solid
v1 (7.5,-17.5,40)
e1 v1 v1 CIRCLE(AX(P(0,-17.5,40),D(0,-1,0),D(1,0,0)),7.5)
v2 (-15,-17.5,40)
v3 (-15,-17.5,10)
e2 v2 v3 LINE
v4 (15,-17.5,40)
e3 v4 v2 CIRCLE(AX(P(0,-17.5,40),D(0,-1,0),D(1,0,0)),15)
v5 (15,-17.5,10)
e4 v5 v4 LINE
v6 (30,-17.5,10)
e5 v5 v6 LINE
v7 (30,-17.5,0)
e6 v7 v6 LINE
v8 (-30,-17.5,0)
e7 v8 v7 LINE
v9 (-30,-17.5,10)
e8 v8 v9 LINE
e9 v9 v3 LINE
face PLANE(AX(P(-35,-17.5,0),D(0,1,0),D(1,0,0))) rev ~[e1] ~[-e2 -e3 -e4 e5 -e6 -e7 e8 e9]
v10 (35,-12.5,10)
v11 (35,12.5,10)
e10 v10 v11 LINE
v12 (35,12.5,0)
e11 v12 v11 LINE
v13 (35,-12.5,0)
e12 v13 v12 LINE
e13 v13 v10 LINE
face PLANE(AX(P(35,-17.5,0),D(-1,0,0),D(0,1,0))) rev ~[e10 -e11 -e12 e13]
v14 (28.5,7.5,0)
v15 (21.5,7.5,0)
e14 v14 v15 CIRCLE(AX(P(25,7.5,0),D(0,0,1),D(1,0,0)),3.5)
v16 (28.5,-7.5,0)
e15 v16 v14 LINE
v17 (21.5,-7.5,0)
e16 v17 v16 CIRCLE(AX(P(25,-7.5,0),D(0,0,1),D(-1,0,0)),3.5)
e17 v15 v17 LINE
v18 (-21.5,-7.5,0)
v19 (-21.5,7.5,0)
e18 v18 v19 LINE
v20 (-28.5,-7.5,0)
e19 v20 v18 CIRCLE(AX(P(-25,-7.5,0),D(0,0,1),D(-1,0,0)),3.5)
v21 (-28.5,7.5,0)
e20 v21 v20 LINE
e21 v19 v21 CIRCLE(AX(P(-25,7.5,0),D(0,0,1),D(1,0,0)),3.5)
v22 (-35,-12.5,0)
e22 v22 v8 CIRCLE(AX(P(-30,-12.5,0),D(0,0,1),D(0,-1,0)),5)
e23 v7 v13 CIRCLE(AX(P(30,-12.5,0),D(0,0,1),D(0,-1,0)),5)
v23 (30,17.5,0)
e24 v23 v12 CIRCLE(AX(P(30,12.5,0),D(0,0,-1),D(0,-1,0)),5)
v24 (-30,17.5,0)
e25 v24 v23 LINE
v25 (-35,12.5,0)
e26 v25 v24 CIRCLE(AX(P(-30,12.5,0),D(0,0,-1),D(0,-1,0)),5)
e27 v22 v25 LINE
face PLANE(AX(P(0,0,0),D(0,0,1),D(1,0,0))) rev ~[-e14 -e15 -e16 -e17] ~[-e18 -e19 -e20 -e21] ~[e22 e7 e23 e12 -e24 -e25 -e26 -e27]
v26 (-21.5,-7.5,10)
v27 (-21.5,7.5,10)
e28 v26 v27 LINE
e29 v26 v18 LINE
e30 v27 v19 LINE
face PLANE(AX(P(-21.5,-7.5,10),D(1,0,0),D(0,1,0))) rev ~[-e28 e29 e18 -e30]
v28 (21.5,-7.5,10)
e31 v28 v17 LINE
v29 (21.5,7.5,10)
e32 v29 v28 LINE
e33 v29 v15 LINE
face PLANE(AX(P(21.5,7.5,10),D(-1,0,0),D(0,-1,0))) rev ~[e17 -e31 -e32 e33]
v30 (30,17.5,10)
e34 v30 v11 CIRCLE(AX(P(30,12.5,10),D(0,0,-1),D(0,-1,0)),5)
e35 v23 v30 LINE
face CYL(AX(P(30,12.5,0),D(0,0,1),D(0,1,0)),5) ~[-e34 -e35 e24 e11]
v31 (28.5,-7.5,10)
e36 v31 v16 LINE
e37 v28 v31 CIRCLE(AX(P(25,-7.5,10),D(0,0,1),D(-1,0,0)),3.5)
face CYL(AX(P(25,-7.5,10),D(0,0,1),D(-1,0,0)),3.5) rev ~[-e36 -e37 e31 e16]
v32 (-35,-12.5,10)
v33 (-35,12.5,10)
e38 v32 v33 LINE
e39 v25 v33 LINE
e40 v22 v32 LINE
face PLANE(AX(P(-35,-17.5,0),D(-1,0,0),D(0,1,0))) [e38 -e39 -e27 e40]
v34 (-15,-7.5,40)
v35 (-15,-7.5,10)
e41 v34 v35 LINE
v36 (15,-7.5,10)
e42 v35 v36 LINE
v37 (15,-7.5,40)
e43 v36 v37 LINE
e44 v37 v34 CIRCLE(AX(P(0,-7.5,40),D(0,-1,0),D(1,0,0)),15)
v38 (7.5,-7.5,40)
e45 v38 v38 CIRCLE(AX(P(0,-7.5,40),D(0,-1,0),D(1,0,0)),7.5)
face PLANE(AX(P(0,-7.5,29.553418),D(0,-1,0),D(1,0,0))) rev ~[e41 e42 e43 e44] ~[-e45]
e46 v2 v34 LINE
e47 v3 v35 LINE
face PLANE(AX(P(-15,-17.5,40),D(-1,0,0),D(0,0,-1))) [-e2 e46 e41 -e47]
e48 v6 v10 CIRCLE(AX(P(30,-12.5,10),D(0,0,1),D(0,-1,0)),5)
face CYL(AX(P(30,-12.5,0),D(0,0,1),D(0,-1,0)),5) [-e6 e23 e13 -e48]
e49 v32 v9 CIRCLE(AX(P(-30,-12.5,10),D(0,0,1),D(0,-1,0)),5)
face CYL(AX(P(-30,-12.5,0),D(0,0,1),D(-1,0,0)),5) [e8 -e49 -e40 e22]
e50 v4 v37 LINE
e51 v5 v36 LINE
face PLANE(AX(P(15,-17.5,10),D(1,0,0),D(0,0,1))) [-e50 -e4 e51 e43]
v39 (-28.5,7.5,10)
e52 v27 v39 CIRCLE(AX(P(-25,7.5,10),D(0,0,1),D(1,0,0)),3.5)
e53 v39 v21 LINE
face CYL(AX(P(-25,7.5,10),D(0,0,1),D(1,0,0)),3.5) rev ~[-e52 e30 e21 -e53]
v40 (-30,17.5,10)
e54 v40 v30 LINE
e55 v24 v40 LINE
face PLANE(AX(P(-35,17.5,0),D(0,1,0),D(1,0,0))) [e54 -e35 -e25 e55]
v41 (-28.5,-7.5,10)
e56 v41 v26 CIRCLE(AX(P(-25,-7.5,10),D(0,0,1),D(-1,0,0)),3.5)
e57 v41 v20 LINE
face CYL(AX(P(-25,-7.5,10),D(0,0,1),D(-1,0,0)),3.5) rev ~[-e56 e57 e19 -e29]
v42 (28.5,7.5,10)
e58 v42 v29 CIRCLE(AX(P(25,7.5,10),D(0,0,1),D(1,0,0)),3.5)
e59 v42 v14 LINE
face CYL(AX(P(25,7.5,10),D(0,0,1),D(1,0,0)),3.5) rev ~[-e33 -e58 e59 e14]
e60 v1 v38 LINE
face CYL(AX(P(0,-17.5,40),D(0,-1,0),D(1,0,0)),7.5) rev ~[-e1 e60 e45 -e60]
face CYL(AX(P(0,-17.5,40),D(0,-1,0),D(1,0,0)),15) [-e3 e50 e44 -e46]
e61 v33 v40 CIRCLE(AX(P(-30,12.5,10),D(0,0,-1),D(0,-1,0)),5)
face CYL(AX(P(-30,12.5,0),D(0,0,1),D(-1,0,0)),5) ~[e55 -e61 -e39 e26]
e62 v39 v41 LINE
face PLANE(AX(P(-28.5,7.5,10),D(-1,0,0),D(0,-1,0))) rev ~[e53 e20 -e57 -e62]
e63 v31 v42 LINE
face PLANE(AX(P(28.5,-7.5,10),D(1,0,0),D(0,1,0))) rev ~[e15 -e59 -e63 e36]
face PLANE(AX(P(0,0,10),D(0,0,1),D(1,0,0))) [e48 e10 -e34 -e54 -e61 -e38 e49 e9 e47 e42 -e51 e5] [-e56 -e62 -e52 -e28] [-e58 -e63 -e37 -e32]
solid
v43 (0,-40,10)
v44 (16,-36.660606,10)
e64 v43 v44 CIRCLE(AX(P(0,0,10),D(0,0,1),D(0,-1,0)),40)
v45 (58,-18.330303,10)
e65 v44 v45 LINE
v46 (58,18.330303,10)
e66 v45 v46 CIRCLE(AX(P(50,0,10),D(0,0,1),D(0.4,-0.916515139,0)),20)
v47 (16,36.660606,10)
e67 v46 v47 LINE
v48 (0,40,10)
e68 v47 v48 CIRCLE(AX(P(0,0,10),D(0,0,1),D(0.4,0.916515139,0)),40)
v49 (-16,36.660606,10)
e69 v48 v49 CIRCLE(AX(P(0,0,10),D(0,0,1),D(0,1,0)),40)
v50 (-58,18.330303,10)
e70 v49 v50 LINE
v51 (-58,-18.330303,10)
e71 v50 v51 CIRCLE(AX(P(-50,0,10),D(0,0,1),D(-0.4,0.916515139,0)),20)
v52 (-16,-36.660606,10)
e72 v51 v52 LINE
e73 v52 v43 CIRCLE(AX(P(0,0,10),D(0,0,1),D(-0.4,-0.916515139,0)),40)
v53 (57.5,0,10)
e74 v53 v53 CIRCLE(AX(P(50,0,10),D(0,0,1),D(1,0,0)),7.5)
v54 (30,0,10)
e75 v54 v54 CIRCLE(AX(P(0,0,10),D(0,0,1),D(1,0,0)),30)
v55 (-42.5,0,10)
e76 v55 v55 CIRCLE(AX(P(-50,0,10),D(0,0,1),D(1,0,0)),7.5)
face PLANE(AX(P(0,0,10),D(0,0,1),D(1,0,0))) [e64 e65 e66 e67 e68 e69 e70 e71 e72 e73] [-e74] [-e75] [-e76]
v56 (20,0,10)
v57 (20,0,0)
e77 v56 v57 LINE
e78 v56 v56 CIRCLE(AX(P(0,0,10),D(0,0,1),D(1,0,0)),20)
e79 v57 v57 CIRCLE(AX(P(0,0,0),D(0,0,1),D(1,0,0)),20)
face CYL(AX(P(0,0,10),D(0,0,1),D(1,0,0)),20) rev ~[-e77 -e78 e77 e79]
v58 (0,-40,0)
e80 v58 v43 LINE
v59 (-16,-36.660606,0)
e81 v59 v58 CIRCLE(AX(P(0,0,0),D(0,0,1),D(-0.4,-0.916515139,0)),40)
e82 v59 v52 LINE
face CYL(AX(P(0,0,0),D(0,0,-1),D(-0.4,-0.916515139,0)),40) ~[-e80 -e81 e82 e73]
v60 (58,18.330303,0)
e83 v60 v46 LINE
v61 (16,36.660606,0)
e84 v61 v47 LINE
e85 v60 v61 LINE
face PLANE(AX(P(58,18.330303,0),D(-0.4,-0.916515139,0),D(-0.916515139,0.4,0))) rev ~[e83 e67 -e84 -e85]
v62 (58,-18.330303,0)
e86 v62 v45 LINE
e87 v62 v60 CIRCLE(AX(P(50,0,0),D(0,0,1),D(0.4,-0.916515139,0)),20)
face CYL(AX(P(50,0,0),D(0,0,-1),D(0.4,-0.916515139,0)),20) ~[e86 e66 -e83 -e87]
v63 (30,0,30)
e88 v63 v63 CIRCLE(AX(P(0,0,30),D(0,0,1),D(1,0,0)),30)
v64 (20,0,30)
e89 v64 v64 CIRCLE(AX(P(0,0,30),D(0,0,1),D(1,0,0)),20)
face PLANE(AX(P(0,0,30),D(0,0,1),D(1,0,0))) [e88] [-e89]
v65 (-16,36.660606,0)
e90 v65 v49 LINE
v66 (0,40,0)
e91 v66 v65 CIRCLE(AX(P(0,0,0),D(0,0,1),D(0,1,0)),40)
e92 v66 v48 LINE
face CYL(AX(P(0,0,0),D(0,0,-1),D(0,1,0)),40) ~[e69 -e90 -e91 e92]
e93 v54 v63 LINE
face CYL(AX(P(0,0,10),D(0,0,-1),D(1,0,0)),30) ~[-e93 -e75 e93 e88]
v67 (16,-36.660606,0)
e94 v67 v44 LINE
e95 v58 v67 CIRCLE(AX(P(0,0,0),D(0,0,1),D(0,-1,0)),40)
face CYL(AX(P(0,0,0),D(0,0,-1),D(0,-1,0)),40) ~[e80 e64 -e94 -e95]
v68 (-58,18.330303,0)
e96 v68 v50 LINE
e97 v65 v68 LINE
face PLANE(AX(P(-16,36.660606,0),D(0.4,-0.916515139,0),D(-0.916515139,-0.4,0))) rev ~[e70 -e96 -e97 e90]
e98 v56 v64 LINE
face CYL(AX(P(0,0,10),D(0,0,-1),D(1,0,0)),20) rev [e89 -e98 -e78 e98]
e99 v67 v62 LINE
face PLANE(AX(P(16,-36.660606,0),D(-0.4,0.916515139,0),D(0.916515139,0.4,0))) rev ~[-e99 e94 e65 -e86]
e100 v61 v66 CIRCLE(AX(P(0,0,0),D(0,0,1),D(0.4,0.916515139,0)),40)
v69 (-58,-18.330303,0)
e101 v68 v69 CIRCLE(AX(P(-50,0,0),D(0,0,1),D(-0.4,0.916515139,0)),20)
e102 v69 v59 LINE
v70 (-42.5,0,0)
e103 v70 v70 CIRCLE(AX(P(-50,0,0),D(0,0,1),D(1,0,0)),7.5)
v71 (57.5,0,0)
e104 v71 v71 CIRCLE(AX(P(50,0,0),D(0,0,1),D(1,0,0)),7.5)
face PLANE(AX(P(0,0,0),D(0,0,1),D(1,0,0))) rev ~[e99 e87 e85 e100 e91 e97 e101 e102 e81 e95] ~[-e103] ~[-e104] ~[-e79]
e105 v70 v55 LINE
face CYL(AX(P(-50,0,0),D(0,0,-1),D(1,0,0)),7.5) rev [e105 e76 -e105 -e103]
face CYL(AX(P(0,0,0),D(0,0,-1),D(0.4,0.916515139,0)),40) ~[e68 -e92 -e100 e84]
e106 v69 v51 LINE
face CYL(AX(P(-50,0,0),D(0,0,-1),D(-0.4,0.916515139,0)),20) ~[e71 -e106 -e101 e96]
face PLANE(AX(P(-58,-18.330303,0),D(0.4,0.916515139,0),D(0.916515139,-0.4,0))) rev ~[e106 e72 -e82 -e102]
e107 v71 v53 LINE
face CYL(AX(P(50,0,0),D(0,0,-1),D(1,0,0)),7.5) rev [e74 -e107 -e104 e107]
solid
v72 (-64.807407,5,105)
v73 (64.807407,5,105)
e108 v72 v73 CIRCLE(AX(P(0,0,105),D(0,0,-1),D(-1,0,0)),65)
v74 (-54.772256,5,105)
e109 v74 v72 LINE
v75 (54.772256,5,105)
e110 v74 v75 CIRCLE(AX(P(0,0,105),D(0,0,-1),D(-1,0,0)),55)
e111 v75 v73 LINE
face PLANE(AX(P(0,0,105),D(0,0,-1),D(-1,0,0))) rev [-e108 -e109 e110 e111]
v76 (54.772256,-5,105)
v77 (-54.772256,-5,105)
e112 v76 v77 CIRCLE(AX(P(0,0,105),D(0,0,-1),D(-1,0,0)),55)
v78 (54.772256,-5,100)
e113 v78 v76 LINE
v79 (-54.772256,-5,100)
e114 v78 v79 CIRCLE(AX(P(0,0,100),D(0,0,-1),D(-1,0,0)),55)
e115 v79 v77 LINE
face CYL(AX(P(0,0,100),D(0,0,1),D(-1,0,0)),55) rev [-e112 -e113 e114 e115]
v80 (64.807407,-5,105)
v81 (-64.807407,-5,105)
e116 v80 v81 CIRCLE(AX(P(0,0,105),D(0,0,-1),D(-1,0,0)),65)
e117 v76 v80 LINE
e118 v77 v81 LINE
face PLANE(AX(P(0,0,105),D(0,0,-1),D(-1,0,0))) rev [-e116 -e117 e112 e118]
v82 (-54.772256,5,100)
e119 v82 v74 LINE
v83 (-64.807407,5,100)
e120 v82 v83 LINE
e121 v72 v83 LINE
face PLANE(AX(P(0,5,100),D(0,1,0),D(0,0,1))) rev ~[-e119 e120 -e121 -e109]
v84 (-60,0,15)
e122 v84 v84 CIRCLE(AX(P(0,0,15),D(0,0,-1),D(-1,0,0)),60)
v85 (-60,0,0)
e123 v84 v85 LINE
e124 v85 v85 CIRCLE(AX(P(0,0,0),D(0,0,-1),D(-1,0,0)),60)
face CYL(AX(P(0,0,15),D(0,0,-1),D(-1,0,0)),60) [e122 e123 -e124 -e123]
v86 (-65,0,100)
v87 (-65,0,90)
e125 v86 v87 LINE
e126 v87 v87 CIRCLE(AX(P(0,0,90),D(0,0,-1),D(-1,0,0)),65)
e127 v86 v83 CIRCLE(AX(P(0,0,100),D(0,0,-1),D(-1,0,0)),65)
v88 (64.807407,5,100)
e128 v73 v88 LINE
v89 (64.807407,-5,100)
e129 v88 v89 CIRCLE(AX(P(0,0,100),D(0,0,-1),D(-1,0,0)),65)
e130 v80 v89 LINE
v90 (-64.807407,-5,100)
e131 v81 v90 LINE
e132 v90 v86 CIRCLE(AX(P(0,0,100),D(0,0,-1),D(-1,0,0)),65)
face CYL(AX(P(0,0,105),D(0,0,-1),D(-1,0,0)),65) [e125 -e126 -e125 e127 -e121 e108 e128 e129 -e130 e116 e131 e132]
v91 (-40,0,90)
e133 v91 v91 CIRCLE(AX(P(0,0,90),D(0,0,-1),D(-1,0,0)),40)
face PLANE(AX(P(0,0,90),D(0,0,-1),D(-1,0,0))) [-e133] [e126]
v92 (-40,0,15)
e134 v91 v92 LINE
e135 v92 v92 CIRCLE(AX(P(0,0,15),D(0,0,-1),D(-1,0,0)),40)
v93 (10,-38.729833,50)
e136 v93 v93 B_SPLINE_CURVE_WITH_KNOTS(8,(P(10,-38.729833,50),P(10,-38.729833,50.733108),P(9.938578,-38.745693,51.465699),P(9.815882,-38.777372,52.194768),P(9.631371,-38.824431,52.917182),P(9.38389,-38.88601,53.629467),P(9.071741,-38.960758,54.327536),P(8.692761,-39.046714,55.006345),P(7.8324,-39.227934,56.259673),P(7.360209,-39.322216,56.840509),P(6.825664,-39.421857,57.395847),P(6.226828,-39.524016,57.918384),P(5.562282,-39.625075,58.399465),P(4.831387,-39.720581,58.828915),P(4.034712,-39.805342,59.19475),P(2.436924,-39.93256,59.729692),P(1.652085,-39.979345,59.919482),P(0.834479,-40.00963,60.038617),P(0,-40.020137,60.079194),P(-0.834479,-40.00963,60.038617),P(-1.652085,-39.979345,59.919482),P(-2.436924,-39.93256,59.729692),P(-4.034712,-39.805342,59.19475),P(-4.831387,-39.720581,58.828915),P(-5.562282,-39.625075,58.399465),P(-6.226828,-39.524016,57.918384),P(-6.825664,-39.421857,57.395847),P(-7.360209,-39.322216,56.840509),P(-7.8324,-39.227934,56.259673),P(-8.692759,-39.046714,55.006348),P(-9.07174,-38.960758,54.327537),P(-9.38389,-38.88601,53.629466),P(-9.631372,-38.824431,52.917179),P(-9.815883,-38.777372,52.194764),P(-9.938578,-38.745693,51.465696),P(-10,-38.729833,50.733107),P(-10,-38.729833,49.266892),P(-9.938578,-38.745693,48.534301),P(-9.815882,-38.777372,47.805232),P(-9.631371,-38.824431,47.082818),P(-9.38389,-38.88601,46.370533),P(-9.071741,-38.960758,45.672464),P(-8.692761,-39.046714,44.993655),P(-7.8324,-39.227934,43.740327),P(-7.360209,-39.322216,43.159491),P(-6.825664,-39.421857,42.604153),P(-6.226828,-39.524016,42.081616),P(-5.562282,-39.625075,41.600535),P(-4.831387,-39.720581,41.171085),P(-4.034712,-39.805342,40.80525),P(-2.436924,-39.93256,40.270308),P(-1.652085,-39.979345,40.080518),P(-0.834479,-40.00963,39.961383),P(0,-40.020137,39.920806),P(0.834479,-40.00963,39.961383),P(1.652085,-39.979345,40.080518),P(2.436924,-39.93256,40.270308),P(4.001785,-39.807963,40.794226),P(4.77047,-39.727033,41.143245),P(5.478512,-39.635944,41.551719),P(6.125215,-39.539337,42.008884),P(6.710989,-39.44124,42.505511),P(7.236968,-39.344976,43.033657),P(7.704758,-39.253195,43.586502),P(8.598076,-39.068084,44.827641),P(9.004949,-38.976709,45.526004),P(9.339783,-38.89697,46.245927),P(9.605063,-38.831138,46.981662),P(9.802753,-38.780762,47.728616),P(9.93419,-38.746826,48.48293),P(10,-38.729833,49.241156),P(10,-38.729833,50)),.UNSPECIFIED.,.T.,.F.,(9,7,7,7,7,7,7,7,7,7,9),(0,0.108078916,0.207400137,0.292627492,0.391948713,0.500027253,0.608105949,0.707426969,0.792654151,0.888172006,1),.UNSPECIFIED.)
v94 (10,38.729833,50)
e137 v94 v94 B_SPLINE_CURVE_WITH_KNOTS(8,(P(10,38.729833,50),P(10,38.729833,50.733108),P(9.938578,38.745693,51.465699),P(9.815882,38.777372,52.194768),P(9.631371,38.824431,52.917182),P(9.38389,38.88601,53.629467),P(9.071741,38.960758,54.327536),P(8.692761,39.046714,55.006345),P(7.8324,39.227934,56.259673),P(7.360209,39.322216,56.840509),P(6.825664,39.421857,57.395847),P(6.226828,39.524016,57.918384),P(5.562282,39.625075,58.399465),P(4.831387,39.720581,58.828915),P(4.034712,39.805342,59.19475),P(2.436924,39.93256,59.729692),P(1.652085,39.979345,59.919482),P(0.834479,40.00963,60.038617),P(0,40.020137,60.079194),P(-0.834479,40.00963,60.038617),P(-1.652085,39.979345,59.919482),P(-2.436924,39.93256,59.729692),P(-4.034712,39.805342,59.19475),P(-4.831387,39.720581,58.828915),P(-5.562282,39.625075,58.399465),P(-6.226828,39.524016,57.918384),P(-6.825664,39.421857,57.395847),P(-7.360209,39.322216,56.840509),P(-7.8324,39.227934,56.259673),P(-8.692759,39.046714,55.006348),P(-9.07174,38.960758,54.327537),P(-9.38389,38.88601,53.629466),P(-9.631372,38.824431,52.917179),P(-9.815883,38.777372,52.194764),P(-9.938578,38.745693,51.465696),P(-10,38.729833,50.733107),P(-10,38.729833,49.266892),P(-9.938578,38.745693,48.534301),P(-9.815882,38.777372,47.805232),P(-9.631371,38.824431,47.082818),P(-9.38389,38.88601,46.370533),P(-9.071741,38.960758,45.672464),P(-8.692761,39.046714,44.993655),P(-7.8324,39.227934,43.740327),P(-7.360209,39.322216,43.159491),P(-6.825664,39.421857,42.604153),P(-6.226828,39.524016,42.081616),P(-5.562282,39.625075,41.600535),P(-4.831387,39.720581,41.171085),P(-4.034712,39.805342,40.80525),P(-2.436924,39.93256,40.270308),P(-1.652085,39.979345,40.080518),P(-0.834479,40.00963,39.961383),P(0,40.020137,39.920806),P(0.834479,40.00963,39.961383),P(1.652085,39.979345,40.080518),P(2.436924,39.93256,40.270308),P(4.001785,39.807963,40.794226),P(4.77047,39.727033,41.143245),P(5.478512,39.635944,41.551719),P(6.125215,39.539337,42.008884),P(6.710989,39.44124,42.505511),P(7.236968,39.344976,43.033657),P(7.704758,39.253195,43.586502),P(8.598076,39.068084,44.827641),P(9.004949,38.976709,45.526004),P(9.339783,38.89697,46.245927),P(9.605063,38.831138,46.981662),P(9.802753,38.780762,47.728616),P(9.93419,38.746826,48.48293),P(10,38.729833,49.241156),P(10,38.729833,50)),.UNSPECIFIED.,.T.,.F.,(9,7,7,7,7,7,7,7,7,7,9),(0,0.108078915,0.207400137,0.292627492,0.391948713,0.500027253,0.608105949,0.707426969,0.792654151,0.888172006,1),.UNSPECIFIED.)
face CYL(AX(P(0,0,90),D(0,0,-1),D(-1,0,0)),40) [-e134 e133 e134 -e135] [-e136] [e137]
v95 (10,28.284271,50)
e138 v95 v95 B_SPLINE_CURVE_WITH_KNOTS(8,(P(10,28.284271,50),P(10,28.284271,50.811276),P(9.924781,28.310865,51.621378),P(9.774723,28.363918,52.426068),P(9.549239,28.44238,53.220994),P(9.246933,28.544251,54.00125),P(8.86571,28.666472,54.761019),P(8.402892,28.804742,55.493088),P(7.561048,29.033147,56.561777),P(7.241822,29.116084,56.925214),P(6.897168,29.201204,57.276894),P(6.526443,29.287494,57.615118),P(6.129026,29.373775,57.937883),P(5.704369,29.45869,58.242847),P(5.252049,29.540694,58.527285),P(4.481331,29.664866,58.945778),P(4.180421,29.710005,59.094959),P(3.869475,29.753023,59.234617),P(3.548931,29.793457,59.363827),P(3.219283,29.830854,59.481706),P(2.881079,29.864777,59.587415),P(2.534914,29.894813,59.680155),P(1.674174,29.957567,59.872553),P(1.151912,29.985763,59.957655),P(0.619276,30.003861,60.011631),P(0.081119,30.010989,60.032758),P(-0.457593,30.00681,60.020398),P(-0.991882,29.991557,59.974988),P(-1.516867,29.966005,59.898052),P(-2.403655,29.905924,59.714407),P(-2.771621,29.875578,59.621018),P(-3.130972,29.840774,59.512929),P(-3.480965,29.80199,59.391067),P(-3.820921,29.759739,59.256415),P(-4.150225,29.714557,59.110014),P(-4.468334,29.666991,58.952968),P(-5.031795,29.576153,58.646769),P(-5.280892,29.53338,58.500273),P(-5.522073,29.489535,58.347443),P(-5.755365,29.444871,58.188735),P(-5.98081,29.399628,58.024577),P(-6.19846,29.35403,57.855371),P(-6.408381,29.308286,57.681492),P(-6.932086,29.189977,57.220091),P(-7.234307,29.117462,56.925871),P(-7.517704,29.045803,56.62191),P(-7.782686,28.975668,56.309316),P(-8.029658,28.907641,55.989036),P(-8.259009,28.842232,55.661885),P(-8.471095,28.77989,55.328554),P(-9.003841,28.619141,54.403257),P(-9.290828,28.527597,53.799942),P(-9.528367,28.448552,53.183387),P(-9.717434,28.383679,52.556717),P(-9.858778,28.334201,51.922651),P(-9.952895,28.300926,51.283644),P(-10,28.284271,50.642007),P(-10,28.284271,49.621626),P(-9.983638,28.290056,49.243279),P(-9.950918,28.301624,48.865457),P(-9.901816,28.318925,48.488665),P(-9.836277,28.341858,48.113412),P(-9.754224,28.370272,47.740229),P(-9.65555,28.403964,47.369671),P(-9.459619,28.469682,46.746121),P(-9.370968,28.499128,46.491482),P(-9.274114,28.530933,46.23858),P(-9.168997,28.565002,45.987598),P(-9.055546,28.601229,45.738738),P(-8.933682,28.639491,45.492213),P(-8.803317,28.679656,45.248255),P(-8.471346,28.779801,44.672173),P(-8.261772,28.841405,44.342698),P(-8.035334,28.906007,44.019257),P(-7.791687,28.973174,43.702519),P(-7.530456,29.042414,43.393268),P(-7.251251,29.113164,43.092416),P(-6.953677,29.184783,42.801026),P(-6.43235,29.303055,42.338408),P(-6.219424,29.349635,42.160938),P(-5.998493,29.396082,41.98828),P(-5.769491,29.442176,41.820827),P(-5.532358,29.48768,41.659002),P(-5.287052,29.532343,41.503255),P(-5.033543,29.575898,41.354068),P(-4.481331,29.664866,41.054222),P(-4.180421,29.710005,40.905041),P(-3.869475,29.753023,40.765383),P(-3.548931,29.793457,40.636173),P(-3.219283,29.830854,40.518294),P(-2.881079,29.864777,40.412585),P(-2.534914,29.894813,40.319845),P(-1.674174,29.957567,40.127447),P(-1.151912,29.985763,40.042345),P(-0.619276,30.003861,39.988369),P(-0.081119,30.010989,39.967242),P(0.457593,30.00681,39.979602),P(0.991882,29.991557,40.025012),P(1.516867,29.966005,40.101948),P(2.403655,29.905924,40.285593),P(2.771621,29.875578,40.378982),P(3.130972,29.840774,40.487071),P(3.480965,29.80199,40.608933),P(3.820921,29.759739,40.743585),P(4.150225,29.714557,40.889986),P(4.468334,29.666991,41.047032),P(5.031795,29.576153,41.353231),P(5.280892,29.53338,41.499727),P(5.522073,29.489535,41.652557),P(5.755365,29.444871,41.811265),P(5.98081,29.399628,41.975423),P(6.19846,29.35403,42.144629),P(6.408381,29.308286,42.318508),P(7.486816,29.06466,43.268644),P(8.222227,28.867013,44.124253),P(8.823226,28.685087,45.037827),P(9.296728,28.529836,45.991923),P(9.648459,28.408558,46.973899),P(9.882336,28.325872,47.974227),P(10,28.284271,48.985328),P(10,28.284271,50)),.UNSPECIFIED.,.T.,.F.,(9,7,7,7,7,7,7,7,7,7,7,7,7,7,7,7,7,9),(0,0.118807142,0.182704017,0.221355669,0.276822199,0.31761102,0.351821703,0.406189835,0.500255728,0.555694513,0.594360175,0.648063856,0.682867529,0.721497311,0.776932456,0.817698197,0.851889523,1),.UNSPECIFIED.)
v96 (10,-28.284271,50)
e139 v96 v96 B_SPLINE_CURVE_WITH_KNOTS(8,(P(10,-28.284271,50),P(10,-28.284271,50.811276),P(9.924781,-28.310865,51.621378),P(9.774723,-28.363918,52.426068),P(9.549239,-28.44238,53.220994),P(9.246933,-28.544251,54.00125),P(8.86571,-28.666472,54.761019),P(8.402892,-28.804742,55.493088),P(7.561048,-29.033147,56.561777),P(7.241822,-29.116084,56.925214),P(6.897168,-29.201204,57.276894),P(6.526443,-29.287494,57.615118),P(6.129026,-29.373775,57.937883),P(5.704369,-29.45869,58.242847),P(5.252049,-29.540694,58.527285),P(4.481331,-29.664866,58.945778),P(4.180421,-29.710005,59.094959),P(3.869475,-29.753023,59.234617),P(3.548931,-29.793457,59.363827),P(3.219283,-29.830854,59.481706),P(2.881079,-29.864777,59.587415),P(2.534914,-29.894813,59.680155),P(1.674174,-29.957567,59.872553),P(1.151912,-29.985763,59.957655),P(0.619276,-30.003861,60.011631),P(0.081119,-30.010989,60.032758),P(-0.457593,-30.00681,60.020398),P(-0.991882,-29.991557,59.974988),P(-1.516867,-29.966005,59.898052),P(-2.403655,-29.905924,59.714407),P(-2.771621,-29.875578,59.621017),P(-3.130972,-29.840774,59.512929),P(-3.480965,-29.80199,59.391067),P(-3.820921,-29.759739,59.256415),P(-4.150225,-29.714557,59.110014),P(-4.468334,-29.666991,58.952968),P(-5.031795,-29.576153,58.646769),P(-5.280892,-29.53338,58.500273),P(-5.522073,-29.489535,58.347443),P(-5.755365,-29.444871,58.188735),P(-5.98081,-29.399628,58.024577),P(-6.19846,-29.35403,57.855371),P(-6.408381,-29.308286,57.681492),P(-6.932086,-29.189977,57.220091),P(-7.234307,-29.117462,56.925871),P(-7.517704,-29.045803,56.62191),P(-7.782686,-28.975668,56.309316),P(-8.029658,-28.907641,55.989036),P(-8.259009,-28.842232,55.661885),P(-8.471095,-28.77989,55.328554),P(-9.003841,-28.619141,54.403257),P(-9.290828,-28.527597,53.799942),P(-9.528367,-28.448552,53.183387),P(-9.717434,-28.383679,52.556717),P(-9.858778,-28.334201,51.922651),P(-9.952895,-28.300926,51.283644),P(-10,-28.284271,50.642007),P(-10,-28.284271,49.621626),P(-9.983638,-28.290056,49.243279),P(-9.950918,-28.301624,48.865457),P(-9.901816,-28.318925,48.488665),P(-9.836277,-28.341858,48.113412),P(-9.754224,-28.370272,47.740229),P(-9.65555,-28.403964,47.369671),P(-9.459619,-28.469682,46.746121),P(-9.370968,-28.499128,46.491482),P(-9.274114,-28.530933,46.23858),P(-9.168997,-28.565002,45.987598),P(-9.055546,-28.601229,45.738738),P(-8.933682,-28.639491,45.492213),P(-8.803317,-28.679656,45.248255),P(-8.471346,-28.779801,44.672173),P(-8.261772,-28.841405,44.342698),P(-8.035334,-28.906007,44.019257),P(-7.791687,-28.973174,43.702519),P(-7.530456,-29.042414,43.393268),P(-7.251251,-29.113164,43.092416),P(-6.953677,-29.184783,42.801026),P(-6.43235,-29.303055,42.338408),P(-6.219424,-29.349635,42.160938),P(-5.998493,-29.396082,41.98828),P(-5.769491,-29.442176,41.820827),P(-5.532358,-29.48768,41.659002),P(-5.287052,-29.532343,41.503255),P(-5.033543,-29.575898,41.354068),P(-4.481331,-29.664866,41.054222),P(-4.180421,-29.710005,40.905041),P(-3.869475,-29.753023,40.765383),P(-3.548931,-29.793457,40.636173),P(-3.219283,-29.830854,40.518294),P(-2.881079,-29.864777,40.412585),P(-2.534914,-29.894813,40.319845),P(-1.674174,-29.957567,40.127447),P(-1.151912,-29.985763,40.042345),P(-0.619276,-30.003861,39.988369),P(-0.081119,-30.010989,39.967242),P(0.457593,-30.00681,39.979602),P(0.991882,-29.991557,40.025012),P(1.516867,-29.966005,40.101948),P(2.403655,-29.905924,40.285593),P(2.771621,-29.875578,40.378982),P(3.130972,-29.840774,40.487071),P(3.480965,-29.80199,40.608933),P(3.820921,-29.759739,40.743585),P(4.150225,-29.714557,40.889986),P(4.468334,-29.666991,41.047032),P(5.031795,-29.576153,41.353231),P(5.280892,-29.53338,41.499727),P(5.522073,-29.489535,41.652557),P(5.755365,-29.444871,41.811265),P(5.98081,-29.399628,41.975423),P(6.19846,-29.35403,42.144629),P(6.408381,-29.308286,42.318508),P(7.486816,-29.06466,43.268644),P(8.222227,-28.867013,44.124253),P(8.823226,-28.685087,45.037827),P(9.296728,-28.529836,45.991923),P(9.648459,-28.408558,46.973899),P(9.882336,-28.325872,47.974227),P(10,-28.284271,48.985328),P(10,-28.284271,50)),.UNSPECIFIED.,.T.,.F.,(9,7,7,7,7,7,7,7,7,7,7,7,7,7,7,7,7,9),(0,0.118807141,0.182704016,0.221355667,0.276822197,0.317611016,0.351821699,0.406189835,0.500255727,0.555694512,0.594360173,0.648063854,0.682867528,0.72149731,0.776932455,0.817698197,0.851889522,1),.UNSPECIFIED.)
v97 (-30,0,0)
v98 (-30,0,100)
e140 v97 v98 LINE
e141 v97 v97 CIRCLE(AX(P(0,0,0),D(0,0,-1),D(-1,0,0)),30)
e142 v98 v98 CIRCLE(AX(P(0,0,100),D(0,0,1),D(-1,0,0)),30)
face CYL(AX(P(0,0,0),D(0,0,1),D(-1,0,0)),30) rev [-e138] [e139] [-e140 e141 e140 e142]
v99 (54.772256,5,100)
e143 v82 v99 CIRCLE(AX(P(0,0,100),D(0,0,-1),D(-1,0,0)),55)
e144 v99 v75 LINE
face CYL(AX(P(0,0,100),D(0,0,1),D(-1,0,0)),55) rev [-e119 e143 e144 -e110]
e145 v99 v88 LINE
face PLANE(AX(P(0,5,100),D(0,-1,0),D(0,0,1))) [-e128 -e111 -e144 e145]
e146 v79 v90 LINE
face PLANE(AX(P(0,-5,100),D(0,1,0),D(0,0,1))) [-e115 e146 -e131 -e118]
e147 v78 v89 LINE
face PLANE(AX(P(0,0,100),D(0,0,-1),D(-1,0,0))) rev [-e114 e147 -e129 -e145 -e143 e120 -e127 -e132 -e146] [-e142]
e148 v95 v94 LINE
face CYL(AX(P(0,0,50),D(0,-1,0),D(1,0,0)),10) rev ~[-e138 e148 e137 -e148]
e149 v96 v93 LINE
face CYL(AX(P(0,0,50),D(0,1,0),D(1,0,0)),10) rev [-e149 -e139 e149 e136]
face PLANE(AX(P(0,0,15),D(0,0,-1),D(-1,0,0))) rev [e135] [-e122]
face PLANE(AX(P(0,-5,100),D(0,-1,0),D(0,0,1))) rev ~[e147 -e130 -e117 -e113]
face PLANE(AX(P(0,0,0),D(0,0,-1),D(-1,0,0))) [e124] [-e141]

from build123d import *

# Parameters (mm, degrees)
F0_W           = 70
F0_H           = 35
F1_DEPTH       = 10
F3_DEPTH       = 10
F4_R           = 5
F5_R           = 7.5
F6_DEPTH       = 25
F8_DEPTH       = 10.001
F11_R          = 10
F12_DEPTH      = 65.001
F12_DEPTH_BACK = 65.001
F13_W          = 10
F13_H          = 5
F14_DEPTH      = 65.001
F14_DEPTH_BACK = 65.001
F15_R          = 7.5
F16_DEPTH      = 10
F17_R          = 30
F17_R_2        = 20
F18_DEPTH      = 20
F19_DEPTH      = 10.0010001


with BuildPart() as f1:
    # F0 (on Top) → F1 (new body)
    with BuildSketch(Plane.XY):
        Rectangle(F0_W, F0_H)
    extrude(amount=F1_DEPTH)

    # F2 (on face) → F3 (join)
    with BuildSketch(Plane.XZ.offset(17.5)):
        with BuildLine():
            Line((-15, 40), (-15, 10))
            Line((-15, 10), (15, 10))
            Line((15, 10), (15, 40))
            ThreePointArc((15, 40), (0, 55), (-15, 40))
        make_face()
    extrude(amount=-F3_DEPTH)

    # F4
    f4_edges = [f1.edges().sort_by_distance(p)[0] for p in [
        (-35, -17.5, 5),
        (35, -17.5, 5),
        (35, 17.5, 5),
        (-35, 17.5, 5),
    ]]
    fillet(f4_edges, radius=F4_R)

    # F5 (on face) → F6 (cut)
    with BuildSketch(Plane.XZ.offset(17.5)):
        with Locations((0, 40)):
            Circle(F5_R)
    extrude(amount=-F6_DEPTH, mode=Mode.SUBTRACT)

    # F7 (on face) → F8 (cut, through all)
    with BuildSketch(Plane.XY.offset(10)):
        with BuildLine():
            ThreePointArc((21.5, -7.5), (25, -11), (28.5, -7.5))
            Line((28.5, -7.5), (28.5, 7.5))
            ThreePointArc((28.5, 7.5), (25, 11), (21.5, 7.5))
            Line((21.5, 7.5), (21.5, -7.5))
        make_face()
        with BuildLine():
            Line((-28.5, 7.5), (-28.5, -7.5))
            ThreePointArc((-28.5, -7.5), (-25, -11), (-21.5, -7.5))
            Line((-21.5, -7.5), (-21.5, 7.5))
            ThreePointArc((-21.5, 7.5), (-25, 11), (-28.5, 7.5))
        make_face()
    extrude(amount=-F8_DEPTH, mode=Mode.SUBTRACT)


with BuildPart() as f10:
    # F9 (on Front) → F10 (revolve)
    with BuildSketch(Plane.XZ):
        Polygon((-60, 15), (-60, 0), (-30, 0), (-30, 100), (-55, 100), (-55, 105), (-65, 105), (-65, 90), (-40, 90), (-40, 15), align=None)
    revolve(axis=Axis((0, 0, 5.9435109548), (0, 0, -1)))

    # F11 (on Front) → F12 (cut, two sides)
    with BuildSketch(Plane.XZ) as f12_sk:
        with Locations((0, 50)):
            Circle(F11_R)
    extrude(amount=-F12_DEPTH, mode=Mode.SUBTRACT)
    extrude(f12_sk.sketch, amount=F12_DEPTH_BACK, mode=Mode.SUBTRACT)

    # F13 (on Right) → F14 (cut, two sides)
    with BuildSketch(Plane.YZ) as f14_sk:
        with Locations((0, 102.5)):
            Rectangle(F13_W, F13_H)
    extrude(amount=-F14_DEPTH, mode=Mode.SUBTRACT)
    extrude(f14_sk.sketch, amount=F14_DEPTH_BACK, mode=Mode.SUBTRACT)


with BuildPart() as f16:
    # F15 (on Top) → F16 (new body)
    with BuildSketch(Plane.XY):
        with BuildLine():
            ThreePointArc((16, 36.6606055596), (8.1723857476, 39.1562525172), (0, 40))
            ThreePointArc((0, 40), (-8.1723857476, 39.1562525172), (-16, 36.6606055596))
            Line((-16, 36.6606055596), (-58, 18.3303027798))
            ThreePointArc((-58, 18.3303027798), (-70, 0), (-58, -18.3303027798))
            Line((-58, -18.3303027798), (-16, -36.6606055596))
            ThreePointArc((-16, -36.6606055596), (-8.1723857476, -39.1562525172), (0, -40))
            ThreePointArc((0, -40), (8.1723857476, -39.1562525172), (16, -36.6606055596))
            Line((16, -36.6606055596), (58, -18.3303027798))
            ThreePointArc((58, -18.3303027798), (70, 0), (58, 18.3303027798))
            Line((58, 18.3303027798), (16, 36.6606055596))
        make_face()
        with Locations((-50, 0)):
            Circle(F15_R, mode=Mode.SUBTRACT)
        with Locations((50, 0)):
            Circle(F15_R, mode=Mode.SUBTRACT)
    extrude(amount=F16_DEPTH)

    # F17 (on face) → F18 (join)
    with BuildSketch(Plane.XY.offset(10)):
        Circle(F17_R)
        Circle(F17_R_2, mode=Mode.SUBTRACT)
    extrude(amount=F18_DEPTH)

    # F19 (cut, through all): a face of the model
    f19_faces = [f16.faces().sort_by_distance(p)[0] for p in [
        (0, 0, 10),
    ]]
    extrude(f19_faces, amount=-F19_DEPTH, mode=Mode.SUBTRACT)


solid = Compound([f1.part, f10.part, f16.part])
